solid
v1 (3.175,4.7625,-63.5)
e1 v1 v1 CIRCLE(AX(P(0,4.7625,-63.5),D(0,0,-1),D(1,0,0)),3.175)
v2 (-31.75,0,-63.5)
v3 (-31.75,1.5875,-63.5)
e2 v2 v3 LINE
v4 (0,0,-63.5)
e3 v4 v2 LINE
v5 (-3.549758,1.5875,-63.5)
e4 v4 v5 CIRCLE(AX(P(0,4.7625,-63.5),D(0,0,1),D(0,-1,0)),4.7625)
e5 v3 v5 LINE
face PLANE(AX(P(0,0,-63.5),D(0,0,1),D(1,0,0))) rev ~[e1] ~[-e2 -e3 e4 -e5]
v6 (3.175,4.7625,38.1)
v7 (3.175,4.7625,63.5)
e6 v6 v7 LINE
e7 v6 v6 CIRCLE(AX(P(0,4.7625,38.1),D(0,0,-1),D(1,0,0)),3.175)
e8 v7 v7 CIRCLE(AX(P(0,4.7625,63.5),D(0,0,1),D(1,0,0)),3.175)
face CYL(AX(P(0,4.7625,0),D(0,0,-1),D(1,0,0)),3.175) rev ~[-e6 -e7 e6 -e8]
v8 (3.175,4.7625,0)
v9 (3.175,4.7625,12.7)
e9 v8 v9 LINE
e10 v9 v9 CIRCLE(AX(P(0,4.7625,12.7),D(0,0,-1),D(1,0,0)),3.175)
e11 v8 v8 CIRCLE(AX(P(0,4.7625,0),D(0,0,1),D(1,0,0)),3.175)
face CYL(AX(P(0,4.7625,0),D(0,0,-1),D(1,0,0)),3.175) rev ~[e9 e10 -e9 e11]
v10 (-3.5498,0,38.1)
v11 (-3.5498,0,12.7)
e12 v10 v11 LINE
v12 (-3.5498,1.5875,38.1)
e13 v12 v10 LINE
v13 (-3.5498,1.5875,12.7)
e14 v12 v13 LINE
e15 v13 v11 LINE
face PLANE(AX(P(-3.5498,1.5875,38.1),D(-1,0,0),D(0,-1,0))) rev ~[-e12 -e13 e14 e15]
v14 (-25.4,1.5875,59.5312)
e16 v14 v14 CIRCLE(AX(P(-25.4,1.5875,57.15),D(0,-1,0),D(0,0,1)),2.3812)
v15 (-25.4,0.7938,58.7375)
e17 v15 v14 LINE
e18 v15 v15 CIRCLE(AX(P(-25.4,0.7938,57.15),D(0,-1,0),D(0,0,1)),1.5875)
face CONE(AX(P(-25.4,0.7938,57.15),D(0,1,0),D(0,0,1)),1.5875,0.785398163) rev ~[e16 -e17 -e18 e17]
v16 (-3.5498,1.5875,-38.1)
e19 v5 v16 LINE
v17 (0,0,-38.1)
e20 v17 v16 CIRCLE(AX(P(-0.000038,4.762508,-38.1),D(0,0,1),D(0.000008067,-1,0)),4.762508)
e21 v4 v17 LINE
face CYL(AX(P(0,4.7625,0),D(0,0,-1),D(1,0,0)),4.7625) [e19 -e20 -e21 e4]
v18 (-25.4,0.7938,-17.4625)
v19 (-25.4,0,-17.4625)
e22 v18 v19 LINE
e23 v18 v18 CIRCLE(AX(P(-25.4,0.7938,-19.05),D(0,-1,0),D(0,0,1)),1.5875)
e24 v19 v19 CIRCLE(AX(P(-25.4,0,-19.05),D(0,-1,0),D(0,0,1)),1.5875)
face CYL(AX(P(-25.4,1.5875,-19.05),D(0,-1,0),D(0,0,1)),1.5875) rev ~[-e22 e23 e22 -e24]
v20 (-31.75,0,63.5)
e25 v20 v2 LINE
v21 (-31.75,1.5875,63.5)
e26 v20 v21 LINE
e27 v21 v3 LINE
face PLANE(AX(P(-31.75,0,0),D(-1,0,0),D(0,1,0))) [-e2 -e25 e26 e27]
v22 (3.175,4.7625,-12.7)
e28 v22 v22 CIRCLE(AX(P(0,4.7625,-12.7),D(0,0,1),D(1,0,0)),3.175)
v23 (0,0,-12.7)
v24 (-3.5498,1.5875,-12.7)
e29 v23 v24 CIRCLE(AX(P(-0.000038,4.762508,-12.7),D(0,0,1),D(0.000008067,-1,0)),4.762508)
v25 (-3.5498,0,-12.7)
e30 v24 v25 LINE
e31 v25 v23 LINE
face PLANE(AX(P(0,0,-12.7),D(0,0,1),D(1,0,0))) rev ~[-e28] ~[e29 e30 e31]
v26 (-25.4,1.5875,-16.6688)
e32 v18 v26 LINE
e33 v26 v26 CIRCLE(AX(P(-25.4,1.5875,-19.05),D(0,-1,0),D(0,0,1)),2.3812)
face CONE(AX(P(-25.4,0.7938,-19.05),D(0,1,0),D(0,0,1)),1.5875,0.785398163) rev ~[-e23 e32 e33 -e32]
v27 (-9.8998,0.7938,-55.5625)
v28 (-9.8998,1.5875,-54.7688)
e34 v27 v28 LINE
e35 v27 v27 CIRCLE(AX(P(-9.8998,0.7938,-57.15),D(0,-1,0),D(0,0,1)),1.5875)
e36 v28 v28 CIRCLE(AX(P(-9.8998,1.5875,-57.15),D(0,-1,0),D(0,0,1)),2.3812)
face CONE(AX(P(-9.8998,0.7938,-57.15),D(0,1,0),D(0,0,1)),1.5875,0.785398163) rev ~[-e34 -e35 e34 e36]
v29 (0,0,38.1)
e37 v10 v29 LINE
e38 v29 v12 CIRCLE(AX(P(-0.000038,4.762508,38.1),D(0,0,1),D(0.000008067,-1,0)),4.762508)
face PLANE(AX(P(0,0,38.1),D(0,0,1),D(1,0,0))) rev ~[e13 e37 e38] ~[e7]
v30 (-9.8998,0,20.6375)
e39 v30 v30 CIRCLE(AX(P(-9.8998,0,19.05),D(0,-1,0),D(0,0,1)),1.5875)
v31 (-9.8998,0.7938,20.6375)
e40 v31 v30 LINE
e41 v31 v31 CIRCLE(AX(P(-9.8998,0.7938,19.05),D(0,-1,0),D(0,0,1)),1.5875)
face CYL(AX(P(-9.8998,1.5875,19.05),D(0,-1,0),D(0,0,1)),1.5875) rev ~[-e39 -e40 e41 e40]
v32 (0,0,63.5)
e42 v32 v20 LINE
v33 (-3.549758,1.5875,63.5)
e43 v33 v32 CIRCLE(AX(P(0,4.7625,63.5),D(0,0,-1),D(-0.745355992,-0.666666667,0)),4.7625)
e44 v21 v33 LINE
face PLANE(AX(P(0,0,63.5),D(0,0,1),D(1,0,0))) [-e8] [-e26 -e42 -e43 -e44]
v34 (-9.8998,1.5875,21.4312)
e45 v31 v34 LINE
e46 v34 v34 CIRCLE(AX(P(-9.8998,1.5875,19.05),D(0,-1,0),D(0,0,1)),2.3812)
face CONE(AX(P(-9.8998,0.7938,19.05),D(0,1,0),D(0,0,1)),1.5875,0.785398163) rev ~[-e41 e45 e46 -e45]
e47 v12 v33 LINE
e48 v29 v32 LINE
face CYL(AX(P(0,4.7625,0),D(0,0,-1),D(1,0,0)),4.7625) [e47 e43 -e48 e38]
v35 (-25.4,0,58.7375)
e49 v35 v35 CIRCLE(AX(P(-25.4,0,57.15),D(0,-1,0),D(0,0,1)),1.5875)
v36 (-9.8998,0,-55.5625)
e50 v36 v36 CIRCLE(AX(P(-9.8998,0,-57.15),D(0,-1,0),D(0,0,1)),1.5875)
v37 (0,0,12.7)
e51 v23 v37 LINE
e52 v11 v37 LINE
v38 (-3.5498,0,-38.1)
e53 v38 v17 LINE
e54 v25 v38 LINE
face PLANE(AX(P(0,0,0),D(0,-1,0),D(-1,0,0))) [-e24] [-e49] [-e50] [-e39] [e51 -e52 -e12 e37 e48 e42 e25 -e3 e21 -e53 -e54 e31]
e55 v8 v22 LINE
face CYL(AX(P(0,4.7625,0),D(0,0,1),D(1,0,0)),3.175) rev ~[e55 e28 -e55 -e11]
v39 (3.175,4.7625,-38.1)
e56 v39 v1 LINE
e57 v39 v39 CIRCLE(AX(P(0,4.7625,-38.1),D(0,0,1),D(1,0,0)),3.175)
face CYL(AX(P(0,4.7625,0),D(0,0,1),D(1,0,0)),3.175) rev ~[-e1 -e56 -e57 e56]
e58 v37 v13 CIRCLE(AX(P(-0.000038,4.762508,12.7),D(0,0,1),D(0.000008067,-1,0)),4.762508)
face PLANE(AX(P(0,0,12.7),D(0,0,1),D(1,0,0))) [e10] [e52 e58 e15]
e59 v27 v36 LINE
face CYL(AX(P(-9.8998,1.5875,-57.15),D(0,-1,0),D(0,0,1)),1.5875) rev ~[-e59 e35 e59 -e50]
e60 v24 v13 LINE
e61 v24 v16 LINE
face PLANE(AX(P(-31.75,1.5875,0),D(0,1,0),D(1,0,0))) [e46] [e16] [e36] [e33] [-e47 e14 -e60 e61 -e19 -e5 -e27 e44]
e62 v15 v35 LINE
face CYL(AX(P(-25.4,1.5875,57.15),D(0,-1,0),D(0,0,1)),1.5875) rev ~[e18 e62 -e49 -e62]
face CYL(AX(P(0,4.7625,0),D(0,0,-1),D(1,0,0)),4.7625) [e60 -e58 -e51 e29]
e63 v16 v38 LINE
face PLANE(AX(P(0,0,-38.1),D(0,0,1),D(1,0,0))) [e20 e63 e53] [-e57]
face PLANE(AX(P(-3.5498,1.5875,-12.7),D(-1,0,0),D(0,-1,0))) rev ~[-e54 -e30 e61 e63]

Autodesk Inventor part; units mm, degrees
ref_plane "YZ Plane" through (0, 0, 0) normal (1, 0, 0) x (0, 1, 0)
ref_plane "XZ Plane" through (0, 0, 0) normal (0, 1, 0) x (-1, 0, 0)
sketch "Sketch1" plane through (0, 0, 0) normal (0, 0, 1) x (1, 0, 0)
  line L0 (0, 0) -> (-31.75, 0)
  line L1 (-31.75, 0) -> (-31.75, 1.5875)
  line L2 (-31.75, 1.5875) -> (0, 1.5875)
  line L3 (0, 1.5875) -> (0, 0)
  circle A0 centre (0, 4.7625) radius 4.7625
  circle A1 centre (0, 4.7625) radius 3.175
  dimension "d0" = 31.75
  dimension "d1" = 1.5875
  dimension "d2" = 9.525
  dimension "d3" = 6.35
extrude "Extrusion1" add sketch "Sketch1" along normal mid plane 127
ref_plane "Work Plane1" through (0, 0, 38.1) normal (0, 0, 1) x (1, 0, 0)
sketch "Sketch2" plane through (0, 0, 38.1) normal (0, 0, 1) x (1, 0, 0)
  arc A0 (0, 0) -> (-3.5498, 1.5875) centre (0, 4.7625) ccw projected
  line L0 (-3.5498, 1.5875) -> (-3.5498, 0)
  line L1 (-3.5498, 0) -> (0, 0)
extrude "Extrusion2" cut sketch "Sketch2" against normal blind 25.4
pattern_linear "Rectangular Pattern1" count 2 spacing 50.8 along (0, 0, -1) of "Extrusion2"
sketch "Sketch3" plane through (-31.75, 1.5875, -63.5) normal (0, 1, 0) x (1, 0, 0)
  line L0 (28.2002, 0) -> (0, 0) construction
  line L1 (0, -127) -> (28.2002, -127) construction
  line L2 (0, 0) -> (28.2002, 0) construction
  line L3 (28.2002, 0) -> (28.2002, -127) construction
  line L4 (28.2002, -127) -> (0, -127) construction
  line L5 (0, -127) -> (0, 0) construction
  line L6 (21.8502, -120.65) -> (21.8502, -6.35) construction
  line L7 (21.8502, -6.35) -> (6.35, -6.35) construction
  line L8 (6.35, -6.35) -> (6.35, -120.65) construction
  line L9 (6.35, -120.65) -> (21.8502, -120.65) construction
  line L10 (6.35, -82.55) -> (21.8502, -82.55) construction
  line L11 (6.35, -44.45) -> (21.8502, -44.45) construction
  line L12 (6.35, -6.35) -> (21.8502, -6.35) construction
  point P0 (31.75, -63.5)
  dimension "d12" = 6.35
  dimension "d15" = 114.3
hole "Hole1" at (-9.8998, 1.5875, -57.15) at (-25.4, 1.5875, 57.15) at (-9.8998, 1.5875, 19.05) at (-25.4, 1.5875, -19.05) direction (0, -1, 0) diameter 3.175 end through all
chamfer "Chamfer1" distance 0.7937 angle 45 4 edges at (-25.4, 1.5875, 55.5625) (-9.8998, 1.5875, 17.4625) (-25.4, 1.5875, -20.6375) (-9.8998, 1.5875, -58.7375)
